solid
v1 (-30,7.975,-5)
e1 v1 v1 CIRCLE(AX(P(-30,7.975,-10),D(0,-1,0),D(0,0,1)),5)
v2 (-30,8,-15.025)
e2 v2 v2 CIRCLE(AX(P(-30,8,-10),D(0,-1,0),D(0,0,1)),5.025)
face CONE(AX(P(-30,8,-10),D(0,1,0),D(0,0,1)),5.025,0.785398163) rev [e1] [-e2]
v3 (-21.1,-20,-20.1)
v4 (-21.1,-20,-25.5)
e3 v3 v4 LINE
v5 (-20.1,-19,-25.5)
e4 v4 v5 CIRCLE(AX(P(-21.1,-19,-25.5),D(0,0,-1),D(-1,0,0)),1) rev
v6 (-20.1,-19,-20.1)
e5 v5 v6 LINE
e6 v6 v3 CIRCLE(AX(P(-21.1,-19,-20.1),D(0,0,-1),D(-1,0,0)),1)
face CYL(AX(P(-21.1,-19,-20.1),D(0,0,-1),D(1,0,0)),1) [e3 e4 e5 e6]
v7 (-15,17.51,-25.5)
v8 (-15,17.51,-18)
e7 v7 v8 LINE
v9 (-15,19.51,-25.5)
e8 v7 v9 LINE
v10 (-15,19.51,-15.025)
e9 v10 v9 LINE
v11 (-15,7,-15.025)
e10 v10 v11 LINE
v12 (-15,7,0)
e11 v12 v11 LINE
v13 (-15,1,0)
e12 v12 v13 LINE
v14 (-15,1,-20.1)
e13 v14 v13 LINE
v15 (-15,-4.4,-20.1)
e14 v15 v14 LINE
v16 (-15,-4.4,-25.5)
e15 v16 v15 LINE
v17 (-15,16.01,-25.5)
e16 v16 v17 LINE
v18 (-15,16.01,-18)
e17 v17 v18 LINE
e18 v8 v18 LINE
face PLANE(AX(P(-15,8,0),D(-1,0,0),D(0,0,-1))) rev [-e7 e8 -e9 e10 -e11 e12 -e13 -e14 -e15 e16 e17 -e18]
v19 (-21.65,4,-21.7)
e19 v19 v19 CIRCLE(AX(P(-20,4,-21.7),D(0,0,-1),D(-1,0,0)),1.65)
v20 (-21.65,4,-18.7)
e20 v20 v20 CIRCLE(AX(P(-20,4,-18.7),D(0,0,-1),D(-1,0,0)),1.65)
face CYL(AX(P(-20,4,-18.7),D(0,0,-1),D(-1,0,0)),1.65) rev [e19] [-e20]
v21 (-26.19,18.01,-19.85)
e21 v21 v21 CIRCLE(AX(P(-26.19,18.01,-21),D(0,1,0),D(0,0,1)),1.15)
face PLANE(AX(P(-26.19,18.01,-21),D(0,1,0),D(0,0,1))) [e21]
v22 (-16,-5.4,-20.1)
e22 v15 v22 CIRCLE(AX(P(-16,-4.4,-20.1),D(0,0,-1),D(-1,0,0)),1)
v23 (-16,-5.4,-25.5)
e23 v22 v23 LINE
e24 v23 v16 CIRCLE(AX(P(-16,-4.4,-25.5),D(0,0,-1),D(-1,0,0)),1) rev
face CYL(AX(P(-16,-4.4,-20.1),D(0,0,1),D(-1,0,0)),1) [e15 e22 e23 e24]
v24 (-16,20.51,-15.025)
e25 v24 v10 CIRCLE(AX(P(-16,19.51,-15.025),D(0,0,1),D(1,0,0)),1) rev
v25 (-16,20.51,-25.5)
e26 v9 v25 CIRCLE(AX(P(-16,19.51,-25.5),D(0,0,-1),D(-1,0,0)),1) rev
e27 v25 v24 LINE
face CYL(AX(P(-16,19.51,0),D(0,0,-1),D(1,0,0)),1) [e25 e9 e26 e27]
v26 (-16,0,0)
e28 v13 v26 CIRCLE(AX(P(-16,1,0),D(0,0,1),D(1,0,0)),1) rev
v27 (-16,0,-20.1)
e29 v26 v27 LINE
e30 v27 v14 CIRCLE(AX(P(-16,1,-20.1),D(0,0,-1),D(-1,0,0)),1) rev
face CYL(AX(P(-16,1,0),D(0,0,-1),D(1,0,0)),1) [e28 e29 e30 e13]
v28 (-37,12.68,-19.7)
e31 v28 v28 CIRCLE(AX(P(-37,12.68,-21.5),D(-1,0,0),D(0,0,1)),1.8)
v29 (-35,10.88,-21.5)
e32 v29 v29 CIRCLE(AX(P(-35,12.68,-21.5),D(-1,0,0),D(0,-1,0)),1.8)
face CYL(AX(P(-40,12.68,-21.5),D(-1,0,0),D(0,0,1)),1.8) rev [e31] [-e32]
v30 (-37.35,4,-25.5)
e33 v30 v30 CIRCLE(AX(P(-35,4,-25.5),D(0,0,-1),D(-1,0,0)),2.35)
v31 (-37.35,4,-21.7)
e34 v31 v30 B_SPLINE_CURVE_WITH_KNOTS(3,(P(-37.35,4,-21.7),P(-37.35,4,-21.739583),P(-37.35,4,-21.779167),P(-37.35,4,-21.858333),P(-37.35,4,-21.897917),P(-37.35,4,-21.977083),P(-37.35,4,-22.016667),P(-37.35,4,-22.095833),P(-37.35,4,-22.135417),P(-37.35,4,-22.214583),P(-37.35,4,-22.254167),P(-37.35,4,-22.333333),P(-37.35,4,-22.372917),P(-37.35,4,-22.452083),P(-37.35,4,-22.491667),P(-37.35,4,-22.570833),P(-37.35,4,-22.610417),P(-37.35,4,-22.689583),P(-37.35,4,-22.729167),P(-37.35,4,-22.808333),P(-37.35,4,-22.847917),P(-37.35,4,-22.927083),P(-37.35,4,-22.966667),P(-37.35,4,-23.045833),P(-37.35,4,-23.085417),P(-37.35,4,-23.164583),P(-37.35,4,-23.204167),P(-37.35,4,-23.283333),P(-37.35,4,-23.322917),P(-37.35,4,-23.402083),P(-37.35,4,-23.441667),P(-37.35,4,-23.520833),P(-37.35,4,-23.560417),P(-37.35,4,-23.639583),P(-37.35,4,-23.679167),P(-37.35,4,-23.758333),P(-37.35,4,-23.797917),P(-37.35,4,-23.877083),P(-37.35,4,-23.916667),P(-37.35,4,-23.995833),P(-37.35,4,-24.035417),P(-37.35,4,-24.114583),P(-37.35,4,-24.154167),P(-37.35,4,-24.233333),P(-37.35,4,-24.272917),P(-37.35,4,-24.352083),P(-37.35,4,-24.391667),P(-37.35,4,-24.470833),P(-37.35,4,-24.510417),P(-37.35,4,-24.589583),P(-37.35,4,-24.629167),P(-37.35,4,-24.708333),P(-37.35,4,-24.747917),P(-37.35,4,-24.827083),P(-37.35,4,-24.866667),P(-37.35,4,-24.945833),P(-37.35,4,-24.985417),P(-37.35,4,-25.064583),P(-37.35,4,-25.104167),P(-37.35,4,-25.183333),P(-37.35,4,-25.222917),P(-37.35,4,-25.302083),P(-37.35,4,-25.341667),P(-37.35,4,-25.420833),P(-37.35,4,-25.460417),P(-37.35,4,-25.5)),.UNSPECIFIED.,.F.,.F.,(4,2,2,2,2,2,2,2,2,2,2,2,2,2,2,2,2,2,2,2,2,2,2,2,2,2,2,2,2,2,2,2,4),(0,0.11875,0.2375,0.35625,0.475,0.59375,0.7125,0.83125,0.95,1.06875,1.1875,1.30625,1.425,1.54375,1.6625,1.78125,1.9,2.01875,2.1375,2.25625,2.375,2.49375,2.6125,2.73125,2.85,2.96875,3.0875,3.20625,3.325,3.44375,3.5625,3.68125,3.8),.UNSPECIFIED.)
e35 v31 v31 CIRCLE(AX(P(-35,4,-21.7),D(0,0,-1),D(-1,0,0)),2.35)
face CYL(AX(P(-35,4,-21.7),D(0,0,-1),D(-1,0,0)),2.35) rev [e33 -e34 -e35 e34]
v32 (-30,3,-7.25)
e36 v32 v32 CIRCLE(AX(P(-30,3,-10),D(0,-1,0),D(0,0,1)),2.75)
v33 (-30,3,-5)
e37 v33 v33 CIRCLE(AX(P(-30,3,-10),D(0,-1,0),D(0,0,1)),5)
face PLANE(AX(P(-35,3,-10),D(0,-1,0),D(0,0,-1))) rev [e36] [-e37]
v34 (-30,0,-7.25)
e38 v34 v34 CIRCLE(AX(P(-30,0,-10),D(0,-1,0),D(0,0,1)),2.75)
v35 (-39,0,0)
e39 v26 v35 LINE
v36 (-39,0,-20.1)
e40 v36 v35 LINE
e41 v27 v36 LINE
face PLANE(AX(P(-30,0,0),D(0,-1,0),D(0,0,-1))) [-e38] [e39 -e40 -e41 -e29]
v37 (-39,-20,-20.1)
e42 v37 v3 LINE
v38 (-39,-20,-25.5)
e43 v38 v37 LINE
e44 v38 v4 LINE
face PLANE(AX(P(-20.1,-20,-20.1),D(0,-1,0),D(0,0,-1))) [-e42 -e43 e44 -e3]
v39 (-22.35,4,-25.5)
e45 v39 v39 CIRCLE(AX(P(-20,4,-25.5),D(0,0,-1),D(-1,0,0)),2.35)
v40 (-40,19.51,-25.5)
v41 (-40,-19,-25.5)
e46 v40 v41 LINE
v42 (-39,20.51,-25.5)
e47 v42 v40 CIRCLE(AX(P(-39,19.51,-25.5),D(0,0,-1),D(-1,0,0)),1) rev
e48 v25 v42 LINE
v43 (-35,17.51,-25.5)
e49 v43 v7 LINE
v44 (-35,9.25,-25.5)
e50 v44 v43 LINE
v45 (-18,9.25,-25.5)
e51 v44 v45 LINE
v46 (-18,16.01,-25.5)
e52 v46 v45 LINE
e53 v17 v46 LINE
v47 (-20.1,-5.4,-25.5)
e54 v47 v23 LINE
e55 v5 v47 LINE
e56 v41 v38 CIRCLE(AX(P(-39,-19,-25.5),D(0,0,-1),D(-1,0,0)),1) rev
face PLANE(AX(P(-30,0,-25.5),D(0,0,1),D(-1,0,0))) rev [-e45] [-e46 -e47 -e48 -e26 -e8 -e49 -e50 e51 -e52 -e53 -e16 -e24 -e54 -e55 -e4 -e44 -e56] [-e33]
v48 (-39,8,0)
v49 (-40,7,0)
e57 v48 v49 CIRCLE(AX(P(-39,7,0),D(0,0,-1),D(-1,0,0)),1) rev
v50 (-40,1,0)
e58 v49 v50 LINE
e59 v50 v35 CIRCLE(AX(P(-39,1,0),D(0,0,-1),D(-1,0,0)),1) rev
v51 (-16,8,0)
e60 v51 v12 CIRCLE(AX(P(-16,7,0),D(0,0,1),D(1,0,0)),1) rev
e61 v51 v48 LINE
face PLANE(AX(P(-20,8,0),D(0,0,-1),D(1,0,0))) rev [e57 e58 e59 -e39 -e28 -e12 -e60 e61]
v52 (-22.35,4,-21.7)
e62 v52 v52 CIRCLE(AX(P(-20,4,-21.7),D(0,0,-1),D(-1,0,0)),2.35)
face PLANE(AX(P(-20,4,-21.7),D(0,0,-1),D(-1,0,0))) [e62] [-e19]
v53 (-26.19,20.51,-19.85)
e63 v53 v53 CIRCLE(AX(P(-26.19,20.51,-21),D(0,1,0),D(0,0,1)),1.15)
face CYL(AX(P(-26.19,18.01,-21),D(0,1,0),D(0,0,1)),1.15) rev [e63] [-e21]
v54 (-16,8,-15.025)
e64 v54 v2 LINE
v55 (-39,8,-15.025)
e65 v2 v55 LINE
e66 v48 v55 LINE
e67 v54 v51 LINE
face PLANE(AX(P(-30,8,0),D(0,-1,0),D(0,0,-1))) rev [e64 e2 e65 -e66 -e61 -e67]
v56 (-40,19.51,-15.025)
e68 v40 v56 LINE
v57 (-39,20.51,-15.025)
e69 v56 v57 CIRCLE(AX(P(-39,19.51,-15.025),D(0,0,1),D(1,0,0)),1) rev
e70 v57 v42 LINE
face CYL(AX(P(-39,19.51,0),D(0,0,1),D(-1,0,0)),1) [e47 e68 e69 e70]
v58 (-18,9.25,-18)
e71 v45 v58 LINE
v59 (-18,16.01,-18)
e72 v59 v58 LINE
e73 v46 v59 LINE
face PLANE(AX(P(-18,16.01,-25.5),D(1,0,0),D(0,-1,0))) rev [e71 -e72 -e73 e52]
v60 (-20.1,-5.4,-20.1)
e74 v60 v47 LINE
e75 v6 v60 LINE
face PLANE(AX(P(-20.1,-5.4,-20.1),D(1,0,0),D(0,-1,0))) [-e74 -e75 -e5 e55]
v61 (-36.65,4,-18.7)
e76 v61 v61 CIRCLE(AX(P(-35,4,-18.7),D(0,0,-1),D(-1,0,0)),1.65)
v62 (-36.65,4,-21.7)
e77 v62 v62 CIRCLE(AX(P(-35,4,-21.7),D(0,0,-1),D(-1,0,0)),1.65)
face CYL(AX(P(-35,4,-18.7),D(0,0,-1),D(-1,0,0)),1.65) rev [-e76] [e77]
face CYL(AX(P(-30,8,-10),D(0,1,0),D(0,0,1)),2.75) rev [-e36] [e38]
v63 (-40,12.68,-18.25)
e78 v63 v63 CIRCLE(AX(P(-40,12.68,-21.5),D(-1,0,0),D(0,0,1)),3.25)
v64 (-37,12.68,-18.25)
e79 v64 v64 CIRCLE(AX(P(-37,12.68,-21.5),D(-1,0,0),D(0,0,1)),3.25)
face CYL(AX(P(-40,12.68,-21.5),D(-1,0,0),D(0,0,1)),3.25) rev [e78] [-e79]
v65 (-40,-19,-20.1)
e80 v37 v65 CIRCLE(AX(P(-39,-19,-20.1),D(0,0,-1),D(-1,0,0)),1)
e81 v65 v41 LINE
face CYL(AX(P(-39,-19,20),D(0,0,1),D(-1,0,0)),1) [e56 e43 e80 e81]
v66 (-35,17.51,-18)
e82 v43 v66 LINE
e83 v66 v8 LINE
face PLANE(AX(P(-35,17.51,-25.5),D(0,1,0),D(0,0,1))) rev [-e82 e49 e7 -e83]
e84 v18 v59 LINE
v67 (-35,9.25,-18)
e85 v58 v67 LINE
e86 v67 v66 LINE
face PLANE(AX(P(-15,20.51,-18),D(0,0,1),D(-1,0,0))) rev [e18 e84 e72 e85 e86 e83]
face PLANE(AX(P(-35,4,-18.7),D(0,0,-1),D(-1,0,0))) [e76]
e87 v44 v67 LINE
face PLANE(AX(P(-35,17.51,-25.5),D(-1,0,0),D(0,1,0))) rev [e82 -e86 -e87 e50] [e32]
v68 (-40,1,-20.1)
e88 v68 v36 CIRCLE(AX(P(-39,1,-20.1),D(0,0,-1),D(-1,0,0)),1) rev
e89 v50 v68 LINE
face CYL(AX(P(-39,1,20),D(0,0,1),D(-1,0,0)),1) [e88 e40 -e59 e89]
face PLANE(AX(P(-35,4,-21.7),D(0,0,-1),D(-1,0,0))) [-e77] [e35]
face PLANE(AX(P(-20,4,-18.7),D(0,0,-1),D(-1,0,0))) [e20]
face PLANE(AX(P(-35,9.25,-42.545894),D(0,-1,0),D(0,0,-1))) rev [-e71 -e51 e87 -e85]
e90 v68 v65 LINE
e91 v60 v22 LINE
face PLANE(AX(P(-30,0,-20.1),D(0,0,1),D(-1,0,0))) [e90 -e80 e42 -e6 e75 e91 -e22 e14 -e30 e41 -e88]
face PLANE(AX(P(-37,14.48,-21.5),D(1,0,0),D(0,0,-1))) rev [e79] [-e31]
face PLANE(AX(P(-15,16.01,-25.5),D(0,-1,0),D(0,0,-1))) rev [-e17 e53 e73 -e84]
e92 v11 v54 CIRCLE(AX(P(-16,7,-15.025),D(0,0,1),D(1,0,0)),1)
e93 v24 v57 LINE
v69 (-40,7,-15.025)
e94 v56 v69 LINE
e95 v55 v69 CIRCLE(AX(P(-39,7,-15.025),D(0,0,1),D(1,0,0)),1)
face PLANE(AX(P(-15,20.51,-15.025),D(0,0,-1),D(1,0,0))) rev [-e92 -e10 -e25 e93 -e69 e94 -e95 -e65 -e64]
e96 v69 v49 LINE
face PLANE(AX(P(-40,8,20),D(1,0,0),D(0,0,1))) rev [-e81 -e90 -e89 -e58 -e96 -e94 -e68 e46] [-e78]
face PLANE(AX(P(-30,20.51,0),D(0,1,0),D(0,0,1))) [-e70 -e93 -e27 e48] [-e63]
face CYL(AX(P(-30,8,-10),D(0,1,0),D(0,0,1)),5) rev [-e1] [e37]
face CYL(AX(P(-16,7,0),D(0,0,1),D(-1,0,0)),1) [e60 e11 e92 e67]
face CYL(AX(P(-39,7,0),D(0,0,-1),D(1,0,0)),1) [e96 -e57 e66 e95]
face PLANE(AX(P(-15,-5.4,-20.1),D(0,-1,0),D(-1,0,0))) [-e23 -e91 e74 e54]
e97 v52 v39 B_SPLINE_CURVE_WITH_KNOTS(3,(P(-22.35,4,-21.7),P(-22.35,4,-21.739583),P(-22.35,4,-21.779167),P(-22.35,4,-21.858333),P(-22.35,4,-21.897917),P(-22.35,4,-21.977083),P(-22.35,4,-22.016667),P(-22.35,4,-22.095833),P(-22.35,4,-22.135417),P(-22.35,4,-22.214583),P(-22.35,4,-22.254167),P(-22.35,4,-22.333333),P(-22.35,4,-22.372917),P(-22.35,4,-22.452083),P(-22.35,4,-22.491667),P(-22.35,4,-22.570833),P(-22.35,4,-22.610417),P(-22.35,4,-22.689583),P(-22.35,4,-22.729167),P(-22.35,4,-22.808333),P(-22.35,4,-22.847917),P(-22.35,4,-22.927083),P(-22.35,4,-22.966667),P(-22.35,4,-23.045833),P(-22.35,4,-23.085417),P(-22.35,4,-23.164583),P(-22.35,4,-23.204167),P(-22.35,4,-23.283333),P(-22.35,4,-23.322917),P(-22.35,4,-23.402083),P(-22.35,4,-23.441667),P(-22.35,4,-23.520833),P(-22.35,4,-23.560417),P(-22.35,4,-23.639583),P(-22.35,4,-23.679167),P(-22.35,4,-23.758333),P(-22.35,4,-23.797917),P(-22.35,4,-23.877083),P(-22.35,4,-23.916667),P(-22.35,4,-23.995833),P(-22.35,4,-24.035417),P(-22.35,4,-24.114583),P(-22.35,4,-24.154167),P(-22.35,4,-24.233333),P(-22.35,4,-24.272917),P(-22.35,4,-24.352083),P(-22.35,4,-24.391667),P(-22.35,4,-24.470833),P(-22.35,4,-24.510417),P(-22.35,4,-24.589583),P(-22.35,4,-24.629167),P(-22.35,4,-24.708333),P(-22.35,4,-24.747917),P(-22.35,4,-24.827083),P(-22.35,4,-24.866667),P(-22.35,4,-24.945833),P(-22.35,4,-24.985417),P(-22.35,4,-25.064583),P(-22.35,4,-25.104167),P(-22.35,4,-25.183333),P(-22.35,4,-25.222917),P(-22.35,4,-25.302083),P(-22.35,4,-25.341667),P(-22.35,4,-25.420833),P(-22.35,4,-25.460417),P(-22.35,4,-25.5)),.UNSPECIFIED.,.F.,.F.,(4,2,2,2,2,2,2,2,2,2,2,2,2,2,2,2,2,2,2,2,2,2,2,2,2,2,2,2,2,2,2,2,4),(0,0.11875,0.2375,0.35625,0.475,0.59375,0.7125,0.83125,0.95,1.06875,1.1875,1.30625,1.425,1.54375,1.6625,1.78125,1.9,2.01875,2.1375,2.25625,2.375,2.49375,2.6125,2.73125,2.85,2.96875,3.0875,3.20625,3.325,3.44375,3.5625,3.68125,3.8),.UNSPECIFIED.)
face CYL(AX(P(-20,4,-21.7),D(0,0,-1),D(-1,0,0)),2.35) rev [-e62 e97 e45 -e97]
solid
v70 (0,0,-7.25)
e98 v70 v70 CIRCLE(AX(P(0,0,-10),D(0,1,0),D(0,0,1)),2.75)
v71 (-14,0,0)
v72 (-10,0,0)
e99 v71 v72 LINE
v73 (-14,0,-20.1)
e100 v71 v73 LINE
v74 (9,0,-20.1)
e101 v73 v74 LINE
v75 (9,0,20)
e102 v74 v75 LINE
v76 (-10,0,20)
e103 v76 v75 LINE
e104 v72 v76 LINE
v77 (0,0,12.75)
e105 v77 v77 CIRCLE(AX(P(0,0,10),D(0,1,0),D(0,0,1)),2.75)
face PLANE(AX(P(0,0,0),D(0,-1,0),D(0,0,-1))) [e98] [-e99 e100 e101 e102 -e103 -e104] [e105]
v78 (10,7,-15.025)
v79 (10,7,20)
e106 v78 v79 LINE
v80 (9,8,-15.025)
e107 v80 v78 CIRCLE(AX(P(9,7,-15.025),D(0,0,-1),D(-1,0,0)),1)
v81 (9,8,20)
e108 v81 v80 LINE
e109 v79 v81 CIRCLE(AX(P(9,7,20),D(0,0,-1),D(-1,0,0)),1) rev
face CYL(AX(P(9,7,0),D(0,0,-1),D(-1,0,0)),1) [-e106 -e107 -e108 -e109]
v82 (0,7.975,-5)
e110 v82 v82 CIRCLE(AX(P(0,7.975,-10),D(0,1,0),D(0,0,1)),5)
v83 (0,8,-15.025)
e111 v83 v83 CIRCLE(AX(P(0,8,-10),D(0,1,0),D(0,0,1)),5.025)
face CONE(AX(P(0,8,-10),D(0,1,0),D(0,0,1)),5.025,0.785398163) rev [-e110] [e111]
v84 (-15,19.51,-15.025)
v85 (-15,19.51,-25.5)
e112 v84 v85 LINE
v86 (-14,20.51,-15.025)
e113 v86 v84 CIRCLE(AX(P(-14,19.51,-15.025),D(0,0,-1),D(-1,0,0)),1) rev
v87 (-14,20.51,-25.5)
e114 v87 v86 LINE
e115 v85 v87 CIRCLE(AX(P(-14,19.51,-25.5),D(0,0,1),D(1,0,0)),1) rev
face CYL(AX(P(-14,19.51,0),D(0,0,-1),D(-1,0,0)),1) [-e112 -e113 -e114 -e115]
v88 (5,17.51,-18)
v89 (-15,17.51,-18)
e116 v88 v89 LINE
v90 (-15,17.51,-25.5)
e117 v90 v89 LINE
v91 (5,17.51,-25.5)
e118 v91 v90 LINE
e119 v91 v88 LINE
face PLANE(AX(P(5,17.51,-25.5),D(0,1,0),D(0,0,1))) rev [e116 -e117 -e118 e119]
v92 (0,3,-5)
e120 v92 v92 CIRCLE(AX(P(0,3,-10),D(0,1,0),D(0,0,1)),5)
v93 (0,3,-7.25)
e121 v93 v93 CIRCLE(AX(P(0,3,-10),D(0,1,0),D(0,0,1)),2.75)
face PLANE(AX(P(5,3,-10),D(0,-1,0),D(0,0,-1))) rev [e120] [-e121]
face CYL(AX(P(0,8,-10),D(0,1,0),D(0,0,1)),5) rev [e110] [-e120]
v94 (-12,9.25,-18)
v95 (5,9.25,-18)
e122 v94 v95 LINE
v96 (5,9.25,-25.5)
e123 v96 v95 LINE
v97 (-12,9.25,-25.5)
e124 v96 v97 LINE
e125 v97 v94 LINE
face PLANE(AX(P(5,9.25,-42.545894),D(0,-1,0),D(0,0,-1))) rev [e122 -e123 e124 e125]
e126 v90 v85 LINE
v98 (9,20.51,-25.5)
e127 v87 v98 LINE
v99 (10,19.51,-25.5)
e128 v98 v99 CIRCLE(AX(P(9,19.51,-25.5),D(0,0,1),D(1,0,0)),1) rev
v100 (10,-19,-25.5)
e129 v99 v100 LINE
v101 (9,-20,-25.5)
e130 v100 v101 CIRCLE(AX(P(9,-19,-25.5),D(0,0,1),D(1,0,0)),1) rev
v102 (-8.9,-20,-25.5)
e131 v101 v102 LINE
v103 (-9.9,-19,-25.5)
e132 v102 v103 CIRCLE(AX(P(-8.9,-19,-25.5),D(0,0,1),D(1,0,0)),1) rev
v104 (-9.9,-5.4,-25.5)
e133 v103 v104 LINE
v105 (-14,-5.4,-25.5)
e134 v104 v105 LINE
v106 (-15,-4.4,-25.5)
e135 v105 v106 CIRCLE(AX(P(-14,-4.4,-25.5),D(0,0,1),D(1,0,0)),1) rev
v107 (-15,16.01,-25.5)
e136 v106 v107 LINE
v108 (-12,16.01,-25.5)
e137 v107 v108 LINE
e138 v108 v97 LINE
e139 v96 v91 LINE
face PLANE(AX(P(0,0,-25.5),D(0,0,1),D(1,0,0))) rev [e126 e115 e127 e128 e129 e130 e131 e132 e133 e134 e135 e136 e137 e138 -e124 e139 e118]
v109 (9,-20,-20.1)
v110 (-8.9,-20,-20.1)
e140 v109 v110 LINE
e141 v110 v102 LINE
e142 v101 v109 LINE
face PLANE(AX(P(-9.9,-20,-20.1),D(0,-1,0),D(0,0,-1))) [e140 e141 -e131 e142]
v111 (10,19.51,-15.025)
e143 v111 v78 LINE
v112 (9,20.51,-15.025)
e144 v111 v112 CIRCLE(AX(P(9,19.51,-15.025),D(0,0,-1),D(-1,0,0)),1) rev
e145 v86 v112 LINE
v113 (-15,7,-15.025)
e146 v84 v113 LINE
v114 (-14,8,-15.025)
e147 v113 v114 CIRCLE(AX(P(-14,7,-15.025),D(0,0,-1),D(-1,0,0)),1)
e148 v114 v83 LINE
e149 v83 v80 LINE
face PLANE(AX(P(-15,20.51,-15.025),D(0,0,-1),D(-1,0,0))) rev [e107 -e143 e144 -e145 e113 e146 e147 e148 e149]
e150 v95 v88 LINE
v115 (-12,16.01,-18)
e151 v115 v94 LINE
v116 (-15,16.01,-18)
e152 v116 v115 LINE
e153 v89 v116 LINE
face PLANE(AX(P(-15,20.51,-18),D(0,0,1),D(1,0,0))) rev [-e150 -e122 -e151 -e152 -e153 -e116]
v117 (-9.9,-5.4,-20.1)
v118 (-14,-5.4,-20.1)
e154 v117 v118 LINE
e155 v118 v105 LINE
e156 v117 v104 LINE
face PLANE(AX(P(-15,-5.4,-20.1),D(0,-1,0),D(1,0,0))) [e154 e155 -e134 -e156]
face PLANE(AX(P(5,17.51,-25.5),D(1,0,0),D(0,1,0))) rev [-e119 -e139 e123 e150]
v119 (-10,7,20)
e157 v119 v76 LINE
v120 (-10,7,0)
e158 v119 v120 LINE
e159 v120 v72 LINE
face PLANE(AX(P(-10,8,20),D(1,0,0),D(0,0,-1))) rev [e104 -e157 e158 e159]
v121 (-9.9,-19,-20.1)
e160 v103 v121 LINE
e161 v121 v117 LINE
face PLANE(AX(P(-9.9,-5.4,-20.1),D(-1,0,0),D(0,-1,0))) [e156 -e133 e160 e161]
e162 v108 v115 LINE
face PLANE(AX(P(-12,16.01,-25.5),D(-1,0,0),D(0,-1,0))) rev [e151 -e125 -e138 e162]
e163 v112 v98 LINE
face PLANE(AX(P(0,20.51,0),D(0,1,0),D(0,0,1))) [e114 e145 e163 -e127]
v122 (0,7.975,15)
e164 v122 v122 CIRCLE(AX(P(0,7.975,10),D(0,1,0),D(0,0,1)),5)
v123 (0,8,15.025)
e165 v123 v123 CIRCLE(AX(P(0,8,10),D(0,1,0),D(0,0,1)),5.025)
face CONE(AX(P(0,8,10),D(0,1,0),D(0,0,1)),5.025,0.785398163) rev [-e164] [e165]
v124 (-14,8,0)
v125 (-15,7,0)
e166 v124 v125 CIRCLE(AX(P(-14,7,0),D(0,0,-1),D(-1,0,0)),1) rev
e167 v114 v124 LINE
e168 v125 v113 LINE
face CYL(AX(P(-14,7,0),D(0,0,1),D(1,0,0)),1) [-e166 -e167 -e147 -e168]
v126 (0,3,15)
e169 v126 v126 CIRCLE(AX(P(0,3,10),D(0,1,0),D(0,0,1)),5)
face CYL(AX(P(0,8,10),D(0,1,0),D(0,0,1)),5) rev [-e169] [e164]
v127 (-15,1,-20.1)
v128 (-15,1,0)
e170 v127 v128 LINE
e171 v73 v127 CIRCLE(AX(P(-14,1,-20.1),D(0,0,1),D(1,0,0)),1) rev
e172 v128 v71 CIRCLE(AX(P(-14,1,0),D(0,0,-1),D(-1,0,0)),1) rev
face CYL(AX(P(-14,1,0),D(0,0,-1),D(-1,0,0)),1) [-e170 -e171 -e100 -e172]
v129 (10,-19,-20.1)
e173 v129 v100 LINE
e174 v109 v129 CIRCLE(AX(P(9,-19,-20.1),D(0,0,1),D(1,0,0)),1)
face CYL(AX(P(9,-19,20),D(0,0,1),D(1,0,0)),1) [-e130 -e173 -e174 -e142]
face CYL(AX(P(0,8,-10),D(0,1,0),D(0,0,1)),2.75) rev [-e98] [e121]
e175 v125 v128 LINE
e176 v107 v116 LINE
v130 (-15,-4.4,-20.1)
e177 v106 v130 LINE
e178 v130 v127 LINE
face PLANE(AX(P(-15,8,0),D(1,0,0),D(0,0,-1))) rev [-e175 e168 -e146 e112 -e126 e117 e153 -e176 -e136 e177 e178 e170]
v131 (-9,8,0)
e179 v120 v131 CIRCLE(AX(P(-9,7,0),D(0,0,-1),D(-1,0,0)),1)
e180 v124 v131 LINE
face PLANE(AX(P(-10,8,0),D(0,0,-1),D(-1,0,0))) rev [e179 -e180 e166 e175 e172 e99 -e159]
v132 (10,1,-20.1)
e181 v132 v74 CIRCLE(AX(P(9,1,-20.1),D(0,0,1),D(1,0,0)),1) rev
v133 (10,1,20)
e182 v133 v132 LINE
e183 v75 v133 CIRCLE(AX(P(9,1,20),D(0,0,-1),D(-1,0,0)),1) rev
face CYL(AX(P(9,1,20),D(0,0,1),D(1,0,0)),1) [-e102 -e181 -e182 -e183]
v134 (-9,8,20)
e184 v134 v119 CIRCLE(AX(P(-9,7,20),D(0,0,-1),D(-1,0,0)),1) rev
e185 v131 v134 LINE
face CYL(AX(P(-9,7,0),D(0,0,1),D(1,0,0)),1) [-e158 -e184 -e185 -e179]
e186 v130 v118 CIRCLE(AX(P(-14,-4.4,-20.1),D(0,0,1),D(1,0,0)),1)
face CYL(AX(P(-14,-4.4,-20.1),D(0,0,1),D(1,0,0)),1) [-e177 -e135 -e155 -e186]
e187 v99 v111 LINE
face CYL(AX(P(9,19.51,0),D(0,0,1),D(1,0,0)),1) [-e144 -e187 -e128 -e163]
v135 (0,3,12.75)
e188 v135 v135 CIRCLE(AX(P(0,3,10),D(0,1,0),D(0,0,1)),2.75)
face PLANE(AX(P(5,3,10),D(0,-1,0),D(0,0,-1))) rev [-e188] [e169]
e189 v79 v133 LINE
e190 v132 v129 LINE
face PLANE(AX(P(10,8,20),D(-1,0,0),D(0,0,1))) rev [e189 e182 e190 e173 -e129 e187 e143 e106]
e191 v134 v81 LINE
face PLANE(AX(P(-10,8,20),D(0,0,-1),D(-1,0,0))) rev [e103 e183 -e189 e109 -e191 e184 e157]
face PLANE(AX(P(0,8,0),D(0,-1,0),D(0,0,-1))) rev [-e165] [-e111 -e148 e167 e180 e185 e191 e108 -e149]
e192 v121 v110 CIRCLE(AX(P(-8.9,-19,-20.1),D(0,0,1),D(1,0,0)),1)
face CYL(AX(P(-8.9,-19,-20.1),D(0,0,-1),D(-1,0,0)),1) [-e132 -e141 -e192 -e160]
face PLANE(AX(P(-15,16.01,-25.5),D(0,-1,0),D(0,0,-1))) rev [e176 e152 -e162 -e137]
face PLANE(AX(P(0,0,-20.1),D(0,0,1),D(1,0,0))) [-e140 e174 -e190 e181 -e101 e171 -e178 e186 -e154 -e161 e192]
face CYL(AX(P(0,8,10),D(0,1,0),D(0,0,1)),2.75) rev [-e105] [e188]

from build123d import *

# Parameters (mm, degrees)
BOSS_EXTRUDE1_DEPTH            = 8
CBORE_FOR_M5_SHCS1_AT_2_COUNT  = 2
CBORE_FOR_M5_SHCS1_AT_2_PITCH  = 20
SKETCH5_W                      = 25
SKETCH5_H                      = 2.975
BOSS_EXTRUDE2_DEPTH            = 12.51
SKETCH6_W                      = 3
SKETCH6_H                      = 8.01
BOSS_EXTRUDE3_DEPTH            = 7.5
BOSS_EXTRUDE4_DEPTH            = 5.5
SKETCH8_W                      = 17
SKETCH8_H                      = 1.25
BOSS_EXTRUDE5_DEPTH            = 7.5
BOSS_EXTRUDE6_DEPTH            = 5.4
FILLET2_R                      = 1
CBORE_START                    = -40
CBORE_FOR_M3_SHCS1_OUTLINE_R   = 3.25
CBORE_FOR_M3_SHCS1_DEPTH       = 3
CBORE_START_2                  = -37
CBORE_FOR_M3_SHCS1_2_OUTLINE_R = 1.8
CBORE_FOR_M3_SHCS1_2_DEPTH     = 2
SKETCH13_R                     = 2.35
CUT_EXTRUDE1_DEPTH             = 3.8
SKETCH14_R                     = 1.65
CUT_EXTRUDE2_DEPTH             = 3
SKETCH15_W                     = 20
SKETCH15_H                     = 20
CUT_EXTRUDE3_DEPTH             = 52.680848484
SKETCH16_R                     = 1.15
CUT_EXTRUDE4_DEPTH             = 2.5


# Read off the part's stored shape, not the designer's step: CBORE for M3 SHCS1
with BuildPart() as part:
    # Sketch1 → Boss-Extrude1 (new body)
    with BuildSketch(Plane(origin=(0, 0, 0), x_dir=(1, 0, 0), z_dir=(0, 1, 0))):
        Polygon((-10, 0), (-15, 0), (-15, 20), (-10, 20), (10, 20), (10, -20), (-10, -20), align=None)
    extrude(amount=BOSS_EXTRUDE1_DEPTH)

    # Sketch4 → CBORE for M5 SHCS1 (revolve, cut)
    with BuildSketch(Plane(origin=(0, 8, -10), x_dir=(0, 0, 1), z_dir=(1, 0, 0))):
        Polygon((0, 0), (0, 8), (2.75, 8), (2.75, 5), (5, 5), (5, 0.025), (5.025, 0), align=None)
    cbore_for_m5_shcs1 = revolve(axis=Axis((0, 14.35, -10), (0, -1, 0)), mode=Mode.SUBTRACT)

    # CBORE for M5 SHCS1 at 2: CBORE for M5 SHCS1 ×2
    with Locations(*[(0, 0, i * CBORE_FOR_M5_SHCS1_AT_2_PITCH) for i in range(1, CBORE_FOR_M5_SHCS1_AT_2_COUNT)]):
        add(cbore_for_m5_shcs1, mode=Mode.SUBTRACT)

    # Sketch5 → Boss-Extrude2 (add)
    with BuildSketch(Plane(origin=(0, 8, 0), x_dir=(1, 0, 0), z_dir=(0, 1, 0))):
        with Locations((-2.5, 16.5125)):
            Rectangle(SKETCH5_W, SKETCH5_H)
    extrude(amount=BOSS_EXTRUDE2_DEPTH)

    # Sketch6 → Boss-Extrude3 (add)
    with BuildSketch(Plane(origin=(0, 0, -18), x_dir=(-1, 0, 0), z_dir=(0, 0, -1))):
        Polygon((-10, 20.51), (15, 20.51), (15, 17.51), (-5, 17.51), (-5, 8), (-10, 8), (-10, 20), align=None)
        with Locations((13.5, 12.005)):
            Rectangle(SKETCH6_W, SKETCH6_H)
    extrude(amount=BOSS_EXTRUDE3_DEPTH)

    # Sketch7 → Boss-Extrude4 (add)
    with BuildSketch(Plane(origin=(0, 0, -20), x_dir=(-1, 0, 0), z_dir=(0, 0, -1))):
        Polygon((-10, 0), (15, 0), (15, 8), (12, 8), (-5, 8), (-10, 8), align=None)
    extrude(amount=BOSS_EXTRUDE4_DEPTH)

    # Sketch8 → Boss-Extrude5 (add)
    with BuildSketch(Plane(origin=(0, 0, -18), x_dir=(-1, 0, 0), z_dir=(0, 0, -1))):
        with Locations((3.5, 8.625)):
            Rectangle(SKETCH8_W, SKETCH8_H)
    extrude(amount=BOSS_EXTRUDE5_DEPTH)

    # Sketch9 → Boss-Extrude6 (add)
    with BuildSketch(Plane(origin=(0, 0, -25.5), x_dir=(-1, 0, 0), z_dir=(0, 0, -1))):
        Polygon((-10, 0), (15, 0), (15, -5.4), (9.9, -5.4), (9.9, -20), (-10, -20), align=None)
    extrude(amount=-BOSS_EXTRUDE6_DEPTH)

    # Fillet2
    fillet2_edges = [part.edges().sort_by_distance(p)[0] for p in [
        (10, 0, -0.05),
        (-15, 0, -10.05),
        (10, -20, -22.8),
        (-15, -5.4, -22.8),
        (-9.9, -20, -22.8),
        (-10, 8, 10),
        (-15, 8, -7.5125),
        (-15, 20.51, -20.2625),
        (10, 20.51, -20.2625),
        (10, 8, 2.4875),
    ]]
    fillet(fillet2_edges, radius=FILLET2_R)


with BuildPart() as body_2:
    # Mirror1: mirrored copy
    add(part.part.mirror(Plane(origin=(-15, 8, 0), x_dir=(0, 0, 1), z_dir=(1, 0, 0))))

    # CBORE for M3 SHCS1 outline → CBORE for M3 SHCS1 (cut)
    with BuildSketch(Plane.YZ.offset(CBORE_START)):
        with Locations((12.68, -21.5)):
            Circle(CBORE_FOR_M3_SHCS1_OUTLINE_R)
    extrude(amount=CBORE_FOR_M3_SHCS1_DEPTH, mode=Mode.SUBTRACT)

    # CBORE for M3 SHCS1 2 outline → CBORE for M3 SHCS1 2 (cut)
    with BuildSketch(Plane.YZ.offset(CBORE_START_2)):
        with Locations((12.68, -21.5)):
            Circle(CBORE_FOR_M3_SHCS1_2_OUTLINE_R)
    extrude(amount=CBORE_FOR_M3_SHCS1_2_DEPTH, mode=Mode.SUBTRACT)

    # Sketch13 → Cut-Extrude1 (cut)
    with BuildSketch(Plane(origin=(0, 0, -25.5), x_dir=(-1, 0, 0), z_dir=(0, 0, -1))):
        with Locations((20, 4)):
            Circle(SKETCH13_R)
        with Locations((35, 4)):
            Circle(SKETCH13_R)
    extrude(amount=-CUT_EXTRUDE1_DEPTH, mode=Mode.SUBTRACT)

    # Sketch14 → Cut-Extrude2 (cut)
    with BuildSketch(Plane(origin=(0, 0, -21.7), x_dir=(-1, 0, 0), z_dir=(0, 0, -1))):
        with Locations((35, 4)):
            Circle(SKETCH14_R)
        with Locations((20, 4)):
            Circle(SKETCH14_R)
    extrude(amount=-CUT_EXTRUDE2_DEPTH, mode=Mode.SUBTRACT)

    # Sketch15 → Cut-Extrude3 (cut, through all)
    with BuildSketch(Plane.XZ):
        with Locations((-30, 10)):
            Rectangle(SKETCH15_W, SKETCH15_H)
    extrude(amount=-CUT_EXTRUDE3_DEPTH, mode=Mode.SUBTRACT)

    # Sketch16 → Cut-Extrude4 (cut, symmetric)
    with BuildSketch(Plane(origin=(0, 20.51, 0), x_dir=(1, 0, 0), z_dir=(0, 1, 0))):
        with Locations(Location((-26.19, 21, 0), (0, 0, 270))):
            Circle(SKETCH16_R)
    extrude(amount=CUT_EXTRUDE4_DEPTH, both=True, mode=Mode.SUBTRACT)


solid = Compound([part.part, body_2.part])
